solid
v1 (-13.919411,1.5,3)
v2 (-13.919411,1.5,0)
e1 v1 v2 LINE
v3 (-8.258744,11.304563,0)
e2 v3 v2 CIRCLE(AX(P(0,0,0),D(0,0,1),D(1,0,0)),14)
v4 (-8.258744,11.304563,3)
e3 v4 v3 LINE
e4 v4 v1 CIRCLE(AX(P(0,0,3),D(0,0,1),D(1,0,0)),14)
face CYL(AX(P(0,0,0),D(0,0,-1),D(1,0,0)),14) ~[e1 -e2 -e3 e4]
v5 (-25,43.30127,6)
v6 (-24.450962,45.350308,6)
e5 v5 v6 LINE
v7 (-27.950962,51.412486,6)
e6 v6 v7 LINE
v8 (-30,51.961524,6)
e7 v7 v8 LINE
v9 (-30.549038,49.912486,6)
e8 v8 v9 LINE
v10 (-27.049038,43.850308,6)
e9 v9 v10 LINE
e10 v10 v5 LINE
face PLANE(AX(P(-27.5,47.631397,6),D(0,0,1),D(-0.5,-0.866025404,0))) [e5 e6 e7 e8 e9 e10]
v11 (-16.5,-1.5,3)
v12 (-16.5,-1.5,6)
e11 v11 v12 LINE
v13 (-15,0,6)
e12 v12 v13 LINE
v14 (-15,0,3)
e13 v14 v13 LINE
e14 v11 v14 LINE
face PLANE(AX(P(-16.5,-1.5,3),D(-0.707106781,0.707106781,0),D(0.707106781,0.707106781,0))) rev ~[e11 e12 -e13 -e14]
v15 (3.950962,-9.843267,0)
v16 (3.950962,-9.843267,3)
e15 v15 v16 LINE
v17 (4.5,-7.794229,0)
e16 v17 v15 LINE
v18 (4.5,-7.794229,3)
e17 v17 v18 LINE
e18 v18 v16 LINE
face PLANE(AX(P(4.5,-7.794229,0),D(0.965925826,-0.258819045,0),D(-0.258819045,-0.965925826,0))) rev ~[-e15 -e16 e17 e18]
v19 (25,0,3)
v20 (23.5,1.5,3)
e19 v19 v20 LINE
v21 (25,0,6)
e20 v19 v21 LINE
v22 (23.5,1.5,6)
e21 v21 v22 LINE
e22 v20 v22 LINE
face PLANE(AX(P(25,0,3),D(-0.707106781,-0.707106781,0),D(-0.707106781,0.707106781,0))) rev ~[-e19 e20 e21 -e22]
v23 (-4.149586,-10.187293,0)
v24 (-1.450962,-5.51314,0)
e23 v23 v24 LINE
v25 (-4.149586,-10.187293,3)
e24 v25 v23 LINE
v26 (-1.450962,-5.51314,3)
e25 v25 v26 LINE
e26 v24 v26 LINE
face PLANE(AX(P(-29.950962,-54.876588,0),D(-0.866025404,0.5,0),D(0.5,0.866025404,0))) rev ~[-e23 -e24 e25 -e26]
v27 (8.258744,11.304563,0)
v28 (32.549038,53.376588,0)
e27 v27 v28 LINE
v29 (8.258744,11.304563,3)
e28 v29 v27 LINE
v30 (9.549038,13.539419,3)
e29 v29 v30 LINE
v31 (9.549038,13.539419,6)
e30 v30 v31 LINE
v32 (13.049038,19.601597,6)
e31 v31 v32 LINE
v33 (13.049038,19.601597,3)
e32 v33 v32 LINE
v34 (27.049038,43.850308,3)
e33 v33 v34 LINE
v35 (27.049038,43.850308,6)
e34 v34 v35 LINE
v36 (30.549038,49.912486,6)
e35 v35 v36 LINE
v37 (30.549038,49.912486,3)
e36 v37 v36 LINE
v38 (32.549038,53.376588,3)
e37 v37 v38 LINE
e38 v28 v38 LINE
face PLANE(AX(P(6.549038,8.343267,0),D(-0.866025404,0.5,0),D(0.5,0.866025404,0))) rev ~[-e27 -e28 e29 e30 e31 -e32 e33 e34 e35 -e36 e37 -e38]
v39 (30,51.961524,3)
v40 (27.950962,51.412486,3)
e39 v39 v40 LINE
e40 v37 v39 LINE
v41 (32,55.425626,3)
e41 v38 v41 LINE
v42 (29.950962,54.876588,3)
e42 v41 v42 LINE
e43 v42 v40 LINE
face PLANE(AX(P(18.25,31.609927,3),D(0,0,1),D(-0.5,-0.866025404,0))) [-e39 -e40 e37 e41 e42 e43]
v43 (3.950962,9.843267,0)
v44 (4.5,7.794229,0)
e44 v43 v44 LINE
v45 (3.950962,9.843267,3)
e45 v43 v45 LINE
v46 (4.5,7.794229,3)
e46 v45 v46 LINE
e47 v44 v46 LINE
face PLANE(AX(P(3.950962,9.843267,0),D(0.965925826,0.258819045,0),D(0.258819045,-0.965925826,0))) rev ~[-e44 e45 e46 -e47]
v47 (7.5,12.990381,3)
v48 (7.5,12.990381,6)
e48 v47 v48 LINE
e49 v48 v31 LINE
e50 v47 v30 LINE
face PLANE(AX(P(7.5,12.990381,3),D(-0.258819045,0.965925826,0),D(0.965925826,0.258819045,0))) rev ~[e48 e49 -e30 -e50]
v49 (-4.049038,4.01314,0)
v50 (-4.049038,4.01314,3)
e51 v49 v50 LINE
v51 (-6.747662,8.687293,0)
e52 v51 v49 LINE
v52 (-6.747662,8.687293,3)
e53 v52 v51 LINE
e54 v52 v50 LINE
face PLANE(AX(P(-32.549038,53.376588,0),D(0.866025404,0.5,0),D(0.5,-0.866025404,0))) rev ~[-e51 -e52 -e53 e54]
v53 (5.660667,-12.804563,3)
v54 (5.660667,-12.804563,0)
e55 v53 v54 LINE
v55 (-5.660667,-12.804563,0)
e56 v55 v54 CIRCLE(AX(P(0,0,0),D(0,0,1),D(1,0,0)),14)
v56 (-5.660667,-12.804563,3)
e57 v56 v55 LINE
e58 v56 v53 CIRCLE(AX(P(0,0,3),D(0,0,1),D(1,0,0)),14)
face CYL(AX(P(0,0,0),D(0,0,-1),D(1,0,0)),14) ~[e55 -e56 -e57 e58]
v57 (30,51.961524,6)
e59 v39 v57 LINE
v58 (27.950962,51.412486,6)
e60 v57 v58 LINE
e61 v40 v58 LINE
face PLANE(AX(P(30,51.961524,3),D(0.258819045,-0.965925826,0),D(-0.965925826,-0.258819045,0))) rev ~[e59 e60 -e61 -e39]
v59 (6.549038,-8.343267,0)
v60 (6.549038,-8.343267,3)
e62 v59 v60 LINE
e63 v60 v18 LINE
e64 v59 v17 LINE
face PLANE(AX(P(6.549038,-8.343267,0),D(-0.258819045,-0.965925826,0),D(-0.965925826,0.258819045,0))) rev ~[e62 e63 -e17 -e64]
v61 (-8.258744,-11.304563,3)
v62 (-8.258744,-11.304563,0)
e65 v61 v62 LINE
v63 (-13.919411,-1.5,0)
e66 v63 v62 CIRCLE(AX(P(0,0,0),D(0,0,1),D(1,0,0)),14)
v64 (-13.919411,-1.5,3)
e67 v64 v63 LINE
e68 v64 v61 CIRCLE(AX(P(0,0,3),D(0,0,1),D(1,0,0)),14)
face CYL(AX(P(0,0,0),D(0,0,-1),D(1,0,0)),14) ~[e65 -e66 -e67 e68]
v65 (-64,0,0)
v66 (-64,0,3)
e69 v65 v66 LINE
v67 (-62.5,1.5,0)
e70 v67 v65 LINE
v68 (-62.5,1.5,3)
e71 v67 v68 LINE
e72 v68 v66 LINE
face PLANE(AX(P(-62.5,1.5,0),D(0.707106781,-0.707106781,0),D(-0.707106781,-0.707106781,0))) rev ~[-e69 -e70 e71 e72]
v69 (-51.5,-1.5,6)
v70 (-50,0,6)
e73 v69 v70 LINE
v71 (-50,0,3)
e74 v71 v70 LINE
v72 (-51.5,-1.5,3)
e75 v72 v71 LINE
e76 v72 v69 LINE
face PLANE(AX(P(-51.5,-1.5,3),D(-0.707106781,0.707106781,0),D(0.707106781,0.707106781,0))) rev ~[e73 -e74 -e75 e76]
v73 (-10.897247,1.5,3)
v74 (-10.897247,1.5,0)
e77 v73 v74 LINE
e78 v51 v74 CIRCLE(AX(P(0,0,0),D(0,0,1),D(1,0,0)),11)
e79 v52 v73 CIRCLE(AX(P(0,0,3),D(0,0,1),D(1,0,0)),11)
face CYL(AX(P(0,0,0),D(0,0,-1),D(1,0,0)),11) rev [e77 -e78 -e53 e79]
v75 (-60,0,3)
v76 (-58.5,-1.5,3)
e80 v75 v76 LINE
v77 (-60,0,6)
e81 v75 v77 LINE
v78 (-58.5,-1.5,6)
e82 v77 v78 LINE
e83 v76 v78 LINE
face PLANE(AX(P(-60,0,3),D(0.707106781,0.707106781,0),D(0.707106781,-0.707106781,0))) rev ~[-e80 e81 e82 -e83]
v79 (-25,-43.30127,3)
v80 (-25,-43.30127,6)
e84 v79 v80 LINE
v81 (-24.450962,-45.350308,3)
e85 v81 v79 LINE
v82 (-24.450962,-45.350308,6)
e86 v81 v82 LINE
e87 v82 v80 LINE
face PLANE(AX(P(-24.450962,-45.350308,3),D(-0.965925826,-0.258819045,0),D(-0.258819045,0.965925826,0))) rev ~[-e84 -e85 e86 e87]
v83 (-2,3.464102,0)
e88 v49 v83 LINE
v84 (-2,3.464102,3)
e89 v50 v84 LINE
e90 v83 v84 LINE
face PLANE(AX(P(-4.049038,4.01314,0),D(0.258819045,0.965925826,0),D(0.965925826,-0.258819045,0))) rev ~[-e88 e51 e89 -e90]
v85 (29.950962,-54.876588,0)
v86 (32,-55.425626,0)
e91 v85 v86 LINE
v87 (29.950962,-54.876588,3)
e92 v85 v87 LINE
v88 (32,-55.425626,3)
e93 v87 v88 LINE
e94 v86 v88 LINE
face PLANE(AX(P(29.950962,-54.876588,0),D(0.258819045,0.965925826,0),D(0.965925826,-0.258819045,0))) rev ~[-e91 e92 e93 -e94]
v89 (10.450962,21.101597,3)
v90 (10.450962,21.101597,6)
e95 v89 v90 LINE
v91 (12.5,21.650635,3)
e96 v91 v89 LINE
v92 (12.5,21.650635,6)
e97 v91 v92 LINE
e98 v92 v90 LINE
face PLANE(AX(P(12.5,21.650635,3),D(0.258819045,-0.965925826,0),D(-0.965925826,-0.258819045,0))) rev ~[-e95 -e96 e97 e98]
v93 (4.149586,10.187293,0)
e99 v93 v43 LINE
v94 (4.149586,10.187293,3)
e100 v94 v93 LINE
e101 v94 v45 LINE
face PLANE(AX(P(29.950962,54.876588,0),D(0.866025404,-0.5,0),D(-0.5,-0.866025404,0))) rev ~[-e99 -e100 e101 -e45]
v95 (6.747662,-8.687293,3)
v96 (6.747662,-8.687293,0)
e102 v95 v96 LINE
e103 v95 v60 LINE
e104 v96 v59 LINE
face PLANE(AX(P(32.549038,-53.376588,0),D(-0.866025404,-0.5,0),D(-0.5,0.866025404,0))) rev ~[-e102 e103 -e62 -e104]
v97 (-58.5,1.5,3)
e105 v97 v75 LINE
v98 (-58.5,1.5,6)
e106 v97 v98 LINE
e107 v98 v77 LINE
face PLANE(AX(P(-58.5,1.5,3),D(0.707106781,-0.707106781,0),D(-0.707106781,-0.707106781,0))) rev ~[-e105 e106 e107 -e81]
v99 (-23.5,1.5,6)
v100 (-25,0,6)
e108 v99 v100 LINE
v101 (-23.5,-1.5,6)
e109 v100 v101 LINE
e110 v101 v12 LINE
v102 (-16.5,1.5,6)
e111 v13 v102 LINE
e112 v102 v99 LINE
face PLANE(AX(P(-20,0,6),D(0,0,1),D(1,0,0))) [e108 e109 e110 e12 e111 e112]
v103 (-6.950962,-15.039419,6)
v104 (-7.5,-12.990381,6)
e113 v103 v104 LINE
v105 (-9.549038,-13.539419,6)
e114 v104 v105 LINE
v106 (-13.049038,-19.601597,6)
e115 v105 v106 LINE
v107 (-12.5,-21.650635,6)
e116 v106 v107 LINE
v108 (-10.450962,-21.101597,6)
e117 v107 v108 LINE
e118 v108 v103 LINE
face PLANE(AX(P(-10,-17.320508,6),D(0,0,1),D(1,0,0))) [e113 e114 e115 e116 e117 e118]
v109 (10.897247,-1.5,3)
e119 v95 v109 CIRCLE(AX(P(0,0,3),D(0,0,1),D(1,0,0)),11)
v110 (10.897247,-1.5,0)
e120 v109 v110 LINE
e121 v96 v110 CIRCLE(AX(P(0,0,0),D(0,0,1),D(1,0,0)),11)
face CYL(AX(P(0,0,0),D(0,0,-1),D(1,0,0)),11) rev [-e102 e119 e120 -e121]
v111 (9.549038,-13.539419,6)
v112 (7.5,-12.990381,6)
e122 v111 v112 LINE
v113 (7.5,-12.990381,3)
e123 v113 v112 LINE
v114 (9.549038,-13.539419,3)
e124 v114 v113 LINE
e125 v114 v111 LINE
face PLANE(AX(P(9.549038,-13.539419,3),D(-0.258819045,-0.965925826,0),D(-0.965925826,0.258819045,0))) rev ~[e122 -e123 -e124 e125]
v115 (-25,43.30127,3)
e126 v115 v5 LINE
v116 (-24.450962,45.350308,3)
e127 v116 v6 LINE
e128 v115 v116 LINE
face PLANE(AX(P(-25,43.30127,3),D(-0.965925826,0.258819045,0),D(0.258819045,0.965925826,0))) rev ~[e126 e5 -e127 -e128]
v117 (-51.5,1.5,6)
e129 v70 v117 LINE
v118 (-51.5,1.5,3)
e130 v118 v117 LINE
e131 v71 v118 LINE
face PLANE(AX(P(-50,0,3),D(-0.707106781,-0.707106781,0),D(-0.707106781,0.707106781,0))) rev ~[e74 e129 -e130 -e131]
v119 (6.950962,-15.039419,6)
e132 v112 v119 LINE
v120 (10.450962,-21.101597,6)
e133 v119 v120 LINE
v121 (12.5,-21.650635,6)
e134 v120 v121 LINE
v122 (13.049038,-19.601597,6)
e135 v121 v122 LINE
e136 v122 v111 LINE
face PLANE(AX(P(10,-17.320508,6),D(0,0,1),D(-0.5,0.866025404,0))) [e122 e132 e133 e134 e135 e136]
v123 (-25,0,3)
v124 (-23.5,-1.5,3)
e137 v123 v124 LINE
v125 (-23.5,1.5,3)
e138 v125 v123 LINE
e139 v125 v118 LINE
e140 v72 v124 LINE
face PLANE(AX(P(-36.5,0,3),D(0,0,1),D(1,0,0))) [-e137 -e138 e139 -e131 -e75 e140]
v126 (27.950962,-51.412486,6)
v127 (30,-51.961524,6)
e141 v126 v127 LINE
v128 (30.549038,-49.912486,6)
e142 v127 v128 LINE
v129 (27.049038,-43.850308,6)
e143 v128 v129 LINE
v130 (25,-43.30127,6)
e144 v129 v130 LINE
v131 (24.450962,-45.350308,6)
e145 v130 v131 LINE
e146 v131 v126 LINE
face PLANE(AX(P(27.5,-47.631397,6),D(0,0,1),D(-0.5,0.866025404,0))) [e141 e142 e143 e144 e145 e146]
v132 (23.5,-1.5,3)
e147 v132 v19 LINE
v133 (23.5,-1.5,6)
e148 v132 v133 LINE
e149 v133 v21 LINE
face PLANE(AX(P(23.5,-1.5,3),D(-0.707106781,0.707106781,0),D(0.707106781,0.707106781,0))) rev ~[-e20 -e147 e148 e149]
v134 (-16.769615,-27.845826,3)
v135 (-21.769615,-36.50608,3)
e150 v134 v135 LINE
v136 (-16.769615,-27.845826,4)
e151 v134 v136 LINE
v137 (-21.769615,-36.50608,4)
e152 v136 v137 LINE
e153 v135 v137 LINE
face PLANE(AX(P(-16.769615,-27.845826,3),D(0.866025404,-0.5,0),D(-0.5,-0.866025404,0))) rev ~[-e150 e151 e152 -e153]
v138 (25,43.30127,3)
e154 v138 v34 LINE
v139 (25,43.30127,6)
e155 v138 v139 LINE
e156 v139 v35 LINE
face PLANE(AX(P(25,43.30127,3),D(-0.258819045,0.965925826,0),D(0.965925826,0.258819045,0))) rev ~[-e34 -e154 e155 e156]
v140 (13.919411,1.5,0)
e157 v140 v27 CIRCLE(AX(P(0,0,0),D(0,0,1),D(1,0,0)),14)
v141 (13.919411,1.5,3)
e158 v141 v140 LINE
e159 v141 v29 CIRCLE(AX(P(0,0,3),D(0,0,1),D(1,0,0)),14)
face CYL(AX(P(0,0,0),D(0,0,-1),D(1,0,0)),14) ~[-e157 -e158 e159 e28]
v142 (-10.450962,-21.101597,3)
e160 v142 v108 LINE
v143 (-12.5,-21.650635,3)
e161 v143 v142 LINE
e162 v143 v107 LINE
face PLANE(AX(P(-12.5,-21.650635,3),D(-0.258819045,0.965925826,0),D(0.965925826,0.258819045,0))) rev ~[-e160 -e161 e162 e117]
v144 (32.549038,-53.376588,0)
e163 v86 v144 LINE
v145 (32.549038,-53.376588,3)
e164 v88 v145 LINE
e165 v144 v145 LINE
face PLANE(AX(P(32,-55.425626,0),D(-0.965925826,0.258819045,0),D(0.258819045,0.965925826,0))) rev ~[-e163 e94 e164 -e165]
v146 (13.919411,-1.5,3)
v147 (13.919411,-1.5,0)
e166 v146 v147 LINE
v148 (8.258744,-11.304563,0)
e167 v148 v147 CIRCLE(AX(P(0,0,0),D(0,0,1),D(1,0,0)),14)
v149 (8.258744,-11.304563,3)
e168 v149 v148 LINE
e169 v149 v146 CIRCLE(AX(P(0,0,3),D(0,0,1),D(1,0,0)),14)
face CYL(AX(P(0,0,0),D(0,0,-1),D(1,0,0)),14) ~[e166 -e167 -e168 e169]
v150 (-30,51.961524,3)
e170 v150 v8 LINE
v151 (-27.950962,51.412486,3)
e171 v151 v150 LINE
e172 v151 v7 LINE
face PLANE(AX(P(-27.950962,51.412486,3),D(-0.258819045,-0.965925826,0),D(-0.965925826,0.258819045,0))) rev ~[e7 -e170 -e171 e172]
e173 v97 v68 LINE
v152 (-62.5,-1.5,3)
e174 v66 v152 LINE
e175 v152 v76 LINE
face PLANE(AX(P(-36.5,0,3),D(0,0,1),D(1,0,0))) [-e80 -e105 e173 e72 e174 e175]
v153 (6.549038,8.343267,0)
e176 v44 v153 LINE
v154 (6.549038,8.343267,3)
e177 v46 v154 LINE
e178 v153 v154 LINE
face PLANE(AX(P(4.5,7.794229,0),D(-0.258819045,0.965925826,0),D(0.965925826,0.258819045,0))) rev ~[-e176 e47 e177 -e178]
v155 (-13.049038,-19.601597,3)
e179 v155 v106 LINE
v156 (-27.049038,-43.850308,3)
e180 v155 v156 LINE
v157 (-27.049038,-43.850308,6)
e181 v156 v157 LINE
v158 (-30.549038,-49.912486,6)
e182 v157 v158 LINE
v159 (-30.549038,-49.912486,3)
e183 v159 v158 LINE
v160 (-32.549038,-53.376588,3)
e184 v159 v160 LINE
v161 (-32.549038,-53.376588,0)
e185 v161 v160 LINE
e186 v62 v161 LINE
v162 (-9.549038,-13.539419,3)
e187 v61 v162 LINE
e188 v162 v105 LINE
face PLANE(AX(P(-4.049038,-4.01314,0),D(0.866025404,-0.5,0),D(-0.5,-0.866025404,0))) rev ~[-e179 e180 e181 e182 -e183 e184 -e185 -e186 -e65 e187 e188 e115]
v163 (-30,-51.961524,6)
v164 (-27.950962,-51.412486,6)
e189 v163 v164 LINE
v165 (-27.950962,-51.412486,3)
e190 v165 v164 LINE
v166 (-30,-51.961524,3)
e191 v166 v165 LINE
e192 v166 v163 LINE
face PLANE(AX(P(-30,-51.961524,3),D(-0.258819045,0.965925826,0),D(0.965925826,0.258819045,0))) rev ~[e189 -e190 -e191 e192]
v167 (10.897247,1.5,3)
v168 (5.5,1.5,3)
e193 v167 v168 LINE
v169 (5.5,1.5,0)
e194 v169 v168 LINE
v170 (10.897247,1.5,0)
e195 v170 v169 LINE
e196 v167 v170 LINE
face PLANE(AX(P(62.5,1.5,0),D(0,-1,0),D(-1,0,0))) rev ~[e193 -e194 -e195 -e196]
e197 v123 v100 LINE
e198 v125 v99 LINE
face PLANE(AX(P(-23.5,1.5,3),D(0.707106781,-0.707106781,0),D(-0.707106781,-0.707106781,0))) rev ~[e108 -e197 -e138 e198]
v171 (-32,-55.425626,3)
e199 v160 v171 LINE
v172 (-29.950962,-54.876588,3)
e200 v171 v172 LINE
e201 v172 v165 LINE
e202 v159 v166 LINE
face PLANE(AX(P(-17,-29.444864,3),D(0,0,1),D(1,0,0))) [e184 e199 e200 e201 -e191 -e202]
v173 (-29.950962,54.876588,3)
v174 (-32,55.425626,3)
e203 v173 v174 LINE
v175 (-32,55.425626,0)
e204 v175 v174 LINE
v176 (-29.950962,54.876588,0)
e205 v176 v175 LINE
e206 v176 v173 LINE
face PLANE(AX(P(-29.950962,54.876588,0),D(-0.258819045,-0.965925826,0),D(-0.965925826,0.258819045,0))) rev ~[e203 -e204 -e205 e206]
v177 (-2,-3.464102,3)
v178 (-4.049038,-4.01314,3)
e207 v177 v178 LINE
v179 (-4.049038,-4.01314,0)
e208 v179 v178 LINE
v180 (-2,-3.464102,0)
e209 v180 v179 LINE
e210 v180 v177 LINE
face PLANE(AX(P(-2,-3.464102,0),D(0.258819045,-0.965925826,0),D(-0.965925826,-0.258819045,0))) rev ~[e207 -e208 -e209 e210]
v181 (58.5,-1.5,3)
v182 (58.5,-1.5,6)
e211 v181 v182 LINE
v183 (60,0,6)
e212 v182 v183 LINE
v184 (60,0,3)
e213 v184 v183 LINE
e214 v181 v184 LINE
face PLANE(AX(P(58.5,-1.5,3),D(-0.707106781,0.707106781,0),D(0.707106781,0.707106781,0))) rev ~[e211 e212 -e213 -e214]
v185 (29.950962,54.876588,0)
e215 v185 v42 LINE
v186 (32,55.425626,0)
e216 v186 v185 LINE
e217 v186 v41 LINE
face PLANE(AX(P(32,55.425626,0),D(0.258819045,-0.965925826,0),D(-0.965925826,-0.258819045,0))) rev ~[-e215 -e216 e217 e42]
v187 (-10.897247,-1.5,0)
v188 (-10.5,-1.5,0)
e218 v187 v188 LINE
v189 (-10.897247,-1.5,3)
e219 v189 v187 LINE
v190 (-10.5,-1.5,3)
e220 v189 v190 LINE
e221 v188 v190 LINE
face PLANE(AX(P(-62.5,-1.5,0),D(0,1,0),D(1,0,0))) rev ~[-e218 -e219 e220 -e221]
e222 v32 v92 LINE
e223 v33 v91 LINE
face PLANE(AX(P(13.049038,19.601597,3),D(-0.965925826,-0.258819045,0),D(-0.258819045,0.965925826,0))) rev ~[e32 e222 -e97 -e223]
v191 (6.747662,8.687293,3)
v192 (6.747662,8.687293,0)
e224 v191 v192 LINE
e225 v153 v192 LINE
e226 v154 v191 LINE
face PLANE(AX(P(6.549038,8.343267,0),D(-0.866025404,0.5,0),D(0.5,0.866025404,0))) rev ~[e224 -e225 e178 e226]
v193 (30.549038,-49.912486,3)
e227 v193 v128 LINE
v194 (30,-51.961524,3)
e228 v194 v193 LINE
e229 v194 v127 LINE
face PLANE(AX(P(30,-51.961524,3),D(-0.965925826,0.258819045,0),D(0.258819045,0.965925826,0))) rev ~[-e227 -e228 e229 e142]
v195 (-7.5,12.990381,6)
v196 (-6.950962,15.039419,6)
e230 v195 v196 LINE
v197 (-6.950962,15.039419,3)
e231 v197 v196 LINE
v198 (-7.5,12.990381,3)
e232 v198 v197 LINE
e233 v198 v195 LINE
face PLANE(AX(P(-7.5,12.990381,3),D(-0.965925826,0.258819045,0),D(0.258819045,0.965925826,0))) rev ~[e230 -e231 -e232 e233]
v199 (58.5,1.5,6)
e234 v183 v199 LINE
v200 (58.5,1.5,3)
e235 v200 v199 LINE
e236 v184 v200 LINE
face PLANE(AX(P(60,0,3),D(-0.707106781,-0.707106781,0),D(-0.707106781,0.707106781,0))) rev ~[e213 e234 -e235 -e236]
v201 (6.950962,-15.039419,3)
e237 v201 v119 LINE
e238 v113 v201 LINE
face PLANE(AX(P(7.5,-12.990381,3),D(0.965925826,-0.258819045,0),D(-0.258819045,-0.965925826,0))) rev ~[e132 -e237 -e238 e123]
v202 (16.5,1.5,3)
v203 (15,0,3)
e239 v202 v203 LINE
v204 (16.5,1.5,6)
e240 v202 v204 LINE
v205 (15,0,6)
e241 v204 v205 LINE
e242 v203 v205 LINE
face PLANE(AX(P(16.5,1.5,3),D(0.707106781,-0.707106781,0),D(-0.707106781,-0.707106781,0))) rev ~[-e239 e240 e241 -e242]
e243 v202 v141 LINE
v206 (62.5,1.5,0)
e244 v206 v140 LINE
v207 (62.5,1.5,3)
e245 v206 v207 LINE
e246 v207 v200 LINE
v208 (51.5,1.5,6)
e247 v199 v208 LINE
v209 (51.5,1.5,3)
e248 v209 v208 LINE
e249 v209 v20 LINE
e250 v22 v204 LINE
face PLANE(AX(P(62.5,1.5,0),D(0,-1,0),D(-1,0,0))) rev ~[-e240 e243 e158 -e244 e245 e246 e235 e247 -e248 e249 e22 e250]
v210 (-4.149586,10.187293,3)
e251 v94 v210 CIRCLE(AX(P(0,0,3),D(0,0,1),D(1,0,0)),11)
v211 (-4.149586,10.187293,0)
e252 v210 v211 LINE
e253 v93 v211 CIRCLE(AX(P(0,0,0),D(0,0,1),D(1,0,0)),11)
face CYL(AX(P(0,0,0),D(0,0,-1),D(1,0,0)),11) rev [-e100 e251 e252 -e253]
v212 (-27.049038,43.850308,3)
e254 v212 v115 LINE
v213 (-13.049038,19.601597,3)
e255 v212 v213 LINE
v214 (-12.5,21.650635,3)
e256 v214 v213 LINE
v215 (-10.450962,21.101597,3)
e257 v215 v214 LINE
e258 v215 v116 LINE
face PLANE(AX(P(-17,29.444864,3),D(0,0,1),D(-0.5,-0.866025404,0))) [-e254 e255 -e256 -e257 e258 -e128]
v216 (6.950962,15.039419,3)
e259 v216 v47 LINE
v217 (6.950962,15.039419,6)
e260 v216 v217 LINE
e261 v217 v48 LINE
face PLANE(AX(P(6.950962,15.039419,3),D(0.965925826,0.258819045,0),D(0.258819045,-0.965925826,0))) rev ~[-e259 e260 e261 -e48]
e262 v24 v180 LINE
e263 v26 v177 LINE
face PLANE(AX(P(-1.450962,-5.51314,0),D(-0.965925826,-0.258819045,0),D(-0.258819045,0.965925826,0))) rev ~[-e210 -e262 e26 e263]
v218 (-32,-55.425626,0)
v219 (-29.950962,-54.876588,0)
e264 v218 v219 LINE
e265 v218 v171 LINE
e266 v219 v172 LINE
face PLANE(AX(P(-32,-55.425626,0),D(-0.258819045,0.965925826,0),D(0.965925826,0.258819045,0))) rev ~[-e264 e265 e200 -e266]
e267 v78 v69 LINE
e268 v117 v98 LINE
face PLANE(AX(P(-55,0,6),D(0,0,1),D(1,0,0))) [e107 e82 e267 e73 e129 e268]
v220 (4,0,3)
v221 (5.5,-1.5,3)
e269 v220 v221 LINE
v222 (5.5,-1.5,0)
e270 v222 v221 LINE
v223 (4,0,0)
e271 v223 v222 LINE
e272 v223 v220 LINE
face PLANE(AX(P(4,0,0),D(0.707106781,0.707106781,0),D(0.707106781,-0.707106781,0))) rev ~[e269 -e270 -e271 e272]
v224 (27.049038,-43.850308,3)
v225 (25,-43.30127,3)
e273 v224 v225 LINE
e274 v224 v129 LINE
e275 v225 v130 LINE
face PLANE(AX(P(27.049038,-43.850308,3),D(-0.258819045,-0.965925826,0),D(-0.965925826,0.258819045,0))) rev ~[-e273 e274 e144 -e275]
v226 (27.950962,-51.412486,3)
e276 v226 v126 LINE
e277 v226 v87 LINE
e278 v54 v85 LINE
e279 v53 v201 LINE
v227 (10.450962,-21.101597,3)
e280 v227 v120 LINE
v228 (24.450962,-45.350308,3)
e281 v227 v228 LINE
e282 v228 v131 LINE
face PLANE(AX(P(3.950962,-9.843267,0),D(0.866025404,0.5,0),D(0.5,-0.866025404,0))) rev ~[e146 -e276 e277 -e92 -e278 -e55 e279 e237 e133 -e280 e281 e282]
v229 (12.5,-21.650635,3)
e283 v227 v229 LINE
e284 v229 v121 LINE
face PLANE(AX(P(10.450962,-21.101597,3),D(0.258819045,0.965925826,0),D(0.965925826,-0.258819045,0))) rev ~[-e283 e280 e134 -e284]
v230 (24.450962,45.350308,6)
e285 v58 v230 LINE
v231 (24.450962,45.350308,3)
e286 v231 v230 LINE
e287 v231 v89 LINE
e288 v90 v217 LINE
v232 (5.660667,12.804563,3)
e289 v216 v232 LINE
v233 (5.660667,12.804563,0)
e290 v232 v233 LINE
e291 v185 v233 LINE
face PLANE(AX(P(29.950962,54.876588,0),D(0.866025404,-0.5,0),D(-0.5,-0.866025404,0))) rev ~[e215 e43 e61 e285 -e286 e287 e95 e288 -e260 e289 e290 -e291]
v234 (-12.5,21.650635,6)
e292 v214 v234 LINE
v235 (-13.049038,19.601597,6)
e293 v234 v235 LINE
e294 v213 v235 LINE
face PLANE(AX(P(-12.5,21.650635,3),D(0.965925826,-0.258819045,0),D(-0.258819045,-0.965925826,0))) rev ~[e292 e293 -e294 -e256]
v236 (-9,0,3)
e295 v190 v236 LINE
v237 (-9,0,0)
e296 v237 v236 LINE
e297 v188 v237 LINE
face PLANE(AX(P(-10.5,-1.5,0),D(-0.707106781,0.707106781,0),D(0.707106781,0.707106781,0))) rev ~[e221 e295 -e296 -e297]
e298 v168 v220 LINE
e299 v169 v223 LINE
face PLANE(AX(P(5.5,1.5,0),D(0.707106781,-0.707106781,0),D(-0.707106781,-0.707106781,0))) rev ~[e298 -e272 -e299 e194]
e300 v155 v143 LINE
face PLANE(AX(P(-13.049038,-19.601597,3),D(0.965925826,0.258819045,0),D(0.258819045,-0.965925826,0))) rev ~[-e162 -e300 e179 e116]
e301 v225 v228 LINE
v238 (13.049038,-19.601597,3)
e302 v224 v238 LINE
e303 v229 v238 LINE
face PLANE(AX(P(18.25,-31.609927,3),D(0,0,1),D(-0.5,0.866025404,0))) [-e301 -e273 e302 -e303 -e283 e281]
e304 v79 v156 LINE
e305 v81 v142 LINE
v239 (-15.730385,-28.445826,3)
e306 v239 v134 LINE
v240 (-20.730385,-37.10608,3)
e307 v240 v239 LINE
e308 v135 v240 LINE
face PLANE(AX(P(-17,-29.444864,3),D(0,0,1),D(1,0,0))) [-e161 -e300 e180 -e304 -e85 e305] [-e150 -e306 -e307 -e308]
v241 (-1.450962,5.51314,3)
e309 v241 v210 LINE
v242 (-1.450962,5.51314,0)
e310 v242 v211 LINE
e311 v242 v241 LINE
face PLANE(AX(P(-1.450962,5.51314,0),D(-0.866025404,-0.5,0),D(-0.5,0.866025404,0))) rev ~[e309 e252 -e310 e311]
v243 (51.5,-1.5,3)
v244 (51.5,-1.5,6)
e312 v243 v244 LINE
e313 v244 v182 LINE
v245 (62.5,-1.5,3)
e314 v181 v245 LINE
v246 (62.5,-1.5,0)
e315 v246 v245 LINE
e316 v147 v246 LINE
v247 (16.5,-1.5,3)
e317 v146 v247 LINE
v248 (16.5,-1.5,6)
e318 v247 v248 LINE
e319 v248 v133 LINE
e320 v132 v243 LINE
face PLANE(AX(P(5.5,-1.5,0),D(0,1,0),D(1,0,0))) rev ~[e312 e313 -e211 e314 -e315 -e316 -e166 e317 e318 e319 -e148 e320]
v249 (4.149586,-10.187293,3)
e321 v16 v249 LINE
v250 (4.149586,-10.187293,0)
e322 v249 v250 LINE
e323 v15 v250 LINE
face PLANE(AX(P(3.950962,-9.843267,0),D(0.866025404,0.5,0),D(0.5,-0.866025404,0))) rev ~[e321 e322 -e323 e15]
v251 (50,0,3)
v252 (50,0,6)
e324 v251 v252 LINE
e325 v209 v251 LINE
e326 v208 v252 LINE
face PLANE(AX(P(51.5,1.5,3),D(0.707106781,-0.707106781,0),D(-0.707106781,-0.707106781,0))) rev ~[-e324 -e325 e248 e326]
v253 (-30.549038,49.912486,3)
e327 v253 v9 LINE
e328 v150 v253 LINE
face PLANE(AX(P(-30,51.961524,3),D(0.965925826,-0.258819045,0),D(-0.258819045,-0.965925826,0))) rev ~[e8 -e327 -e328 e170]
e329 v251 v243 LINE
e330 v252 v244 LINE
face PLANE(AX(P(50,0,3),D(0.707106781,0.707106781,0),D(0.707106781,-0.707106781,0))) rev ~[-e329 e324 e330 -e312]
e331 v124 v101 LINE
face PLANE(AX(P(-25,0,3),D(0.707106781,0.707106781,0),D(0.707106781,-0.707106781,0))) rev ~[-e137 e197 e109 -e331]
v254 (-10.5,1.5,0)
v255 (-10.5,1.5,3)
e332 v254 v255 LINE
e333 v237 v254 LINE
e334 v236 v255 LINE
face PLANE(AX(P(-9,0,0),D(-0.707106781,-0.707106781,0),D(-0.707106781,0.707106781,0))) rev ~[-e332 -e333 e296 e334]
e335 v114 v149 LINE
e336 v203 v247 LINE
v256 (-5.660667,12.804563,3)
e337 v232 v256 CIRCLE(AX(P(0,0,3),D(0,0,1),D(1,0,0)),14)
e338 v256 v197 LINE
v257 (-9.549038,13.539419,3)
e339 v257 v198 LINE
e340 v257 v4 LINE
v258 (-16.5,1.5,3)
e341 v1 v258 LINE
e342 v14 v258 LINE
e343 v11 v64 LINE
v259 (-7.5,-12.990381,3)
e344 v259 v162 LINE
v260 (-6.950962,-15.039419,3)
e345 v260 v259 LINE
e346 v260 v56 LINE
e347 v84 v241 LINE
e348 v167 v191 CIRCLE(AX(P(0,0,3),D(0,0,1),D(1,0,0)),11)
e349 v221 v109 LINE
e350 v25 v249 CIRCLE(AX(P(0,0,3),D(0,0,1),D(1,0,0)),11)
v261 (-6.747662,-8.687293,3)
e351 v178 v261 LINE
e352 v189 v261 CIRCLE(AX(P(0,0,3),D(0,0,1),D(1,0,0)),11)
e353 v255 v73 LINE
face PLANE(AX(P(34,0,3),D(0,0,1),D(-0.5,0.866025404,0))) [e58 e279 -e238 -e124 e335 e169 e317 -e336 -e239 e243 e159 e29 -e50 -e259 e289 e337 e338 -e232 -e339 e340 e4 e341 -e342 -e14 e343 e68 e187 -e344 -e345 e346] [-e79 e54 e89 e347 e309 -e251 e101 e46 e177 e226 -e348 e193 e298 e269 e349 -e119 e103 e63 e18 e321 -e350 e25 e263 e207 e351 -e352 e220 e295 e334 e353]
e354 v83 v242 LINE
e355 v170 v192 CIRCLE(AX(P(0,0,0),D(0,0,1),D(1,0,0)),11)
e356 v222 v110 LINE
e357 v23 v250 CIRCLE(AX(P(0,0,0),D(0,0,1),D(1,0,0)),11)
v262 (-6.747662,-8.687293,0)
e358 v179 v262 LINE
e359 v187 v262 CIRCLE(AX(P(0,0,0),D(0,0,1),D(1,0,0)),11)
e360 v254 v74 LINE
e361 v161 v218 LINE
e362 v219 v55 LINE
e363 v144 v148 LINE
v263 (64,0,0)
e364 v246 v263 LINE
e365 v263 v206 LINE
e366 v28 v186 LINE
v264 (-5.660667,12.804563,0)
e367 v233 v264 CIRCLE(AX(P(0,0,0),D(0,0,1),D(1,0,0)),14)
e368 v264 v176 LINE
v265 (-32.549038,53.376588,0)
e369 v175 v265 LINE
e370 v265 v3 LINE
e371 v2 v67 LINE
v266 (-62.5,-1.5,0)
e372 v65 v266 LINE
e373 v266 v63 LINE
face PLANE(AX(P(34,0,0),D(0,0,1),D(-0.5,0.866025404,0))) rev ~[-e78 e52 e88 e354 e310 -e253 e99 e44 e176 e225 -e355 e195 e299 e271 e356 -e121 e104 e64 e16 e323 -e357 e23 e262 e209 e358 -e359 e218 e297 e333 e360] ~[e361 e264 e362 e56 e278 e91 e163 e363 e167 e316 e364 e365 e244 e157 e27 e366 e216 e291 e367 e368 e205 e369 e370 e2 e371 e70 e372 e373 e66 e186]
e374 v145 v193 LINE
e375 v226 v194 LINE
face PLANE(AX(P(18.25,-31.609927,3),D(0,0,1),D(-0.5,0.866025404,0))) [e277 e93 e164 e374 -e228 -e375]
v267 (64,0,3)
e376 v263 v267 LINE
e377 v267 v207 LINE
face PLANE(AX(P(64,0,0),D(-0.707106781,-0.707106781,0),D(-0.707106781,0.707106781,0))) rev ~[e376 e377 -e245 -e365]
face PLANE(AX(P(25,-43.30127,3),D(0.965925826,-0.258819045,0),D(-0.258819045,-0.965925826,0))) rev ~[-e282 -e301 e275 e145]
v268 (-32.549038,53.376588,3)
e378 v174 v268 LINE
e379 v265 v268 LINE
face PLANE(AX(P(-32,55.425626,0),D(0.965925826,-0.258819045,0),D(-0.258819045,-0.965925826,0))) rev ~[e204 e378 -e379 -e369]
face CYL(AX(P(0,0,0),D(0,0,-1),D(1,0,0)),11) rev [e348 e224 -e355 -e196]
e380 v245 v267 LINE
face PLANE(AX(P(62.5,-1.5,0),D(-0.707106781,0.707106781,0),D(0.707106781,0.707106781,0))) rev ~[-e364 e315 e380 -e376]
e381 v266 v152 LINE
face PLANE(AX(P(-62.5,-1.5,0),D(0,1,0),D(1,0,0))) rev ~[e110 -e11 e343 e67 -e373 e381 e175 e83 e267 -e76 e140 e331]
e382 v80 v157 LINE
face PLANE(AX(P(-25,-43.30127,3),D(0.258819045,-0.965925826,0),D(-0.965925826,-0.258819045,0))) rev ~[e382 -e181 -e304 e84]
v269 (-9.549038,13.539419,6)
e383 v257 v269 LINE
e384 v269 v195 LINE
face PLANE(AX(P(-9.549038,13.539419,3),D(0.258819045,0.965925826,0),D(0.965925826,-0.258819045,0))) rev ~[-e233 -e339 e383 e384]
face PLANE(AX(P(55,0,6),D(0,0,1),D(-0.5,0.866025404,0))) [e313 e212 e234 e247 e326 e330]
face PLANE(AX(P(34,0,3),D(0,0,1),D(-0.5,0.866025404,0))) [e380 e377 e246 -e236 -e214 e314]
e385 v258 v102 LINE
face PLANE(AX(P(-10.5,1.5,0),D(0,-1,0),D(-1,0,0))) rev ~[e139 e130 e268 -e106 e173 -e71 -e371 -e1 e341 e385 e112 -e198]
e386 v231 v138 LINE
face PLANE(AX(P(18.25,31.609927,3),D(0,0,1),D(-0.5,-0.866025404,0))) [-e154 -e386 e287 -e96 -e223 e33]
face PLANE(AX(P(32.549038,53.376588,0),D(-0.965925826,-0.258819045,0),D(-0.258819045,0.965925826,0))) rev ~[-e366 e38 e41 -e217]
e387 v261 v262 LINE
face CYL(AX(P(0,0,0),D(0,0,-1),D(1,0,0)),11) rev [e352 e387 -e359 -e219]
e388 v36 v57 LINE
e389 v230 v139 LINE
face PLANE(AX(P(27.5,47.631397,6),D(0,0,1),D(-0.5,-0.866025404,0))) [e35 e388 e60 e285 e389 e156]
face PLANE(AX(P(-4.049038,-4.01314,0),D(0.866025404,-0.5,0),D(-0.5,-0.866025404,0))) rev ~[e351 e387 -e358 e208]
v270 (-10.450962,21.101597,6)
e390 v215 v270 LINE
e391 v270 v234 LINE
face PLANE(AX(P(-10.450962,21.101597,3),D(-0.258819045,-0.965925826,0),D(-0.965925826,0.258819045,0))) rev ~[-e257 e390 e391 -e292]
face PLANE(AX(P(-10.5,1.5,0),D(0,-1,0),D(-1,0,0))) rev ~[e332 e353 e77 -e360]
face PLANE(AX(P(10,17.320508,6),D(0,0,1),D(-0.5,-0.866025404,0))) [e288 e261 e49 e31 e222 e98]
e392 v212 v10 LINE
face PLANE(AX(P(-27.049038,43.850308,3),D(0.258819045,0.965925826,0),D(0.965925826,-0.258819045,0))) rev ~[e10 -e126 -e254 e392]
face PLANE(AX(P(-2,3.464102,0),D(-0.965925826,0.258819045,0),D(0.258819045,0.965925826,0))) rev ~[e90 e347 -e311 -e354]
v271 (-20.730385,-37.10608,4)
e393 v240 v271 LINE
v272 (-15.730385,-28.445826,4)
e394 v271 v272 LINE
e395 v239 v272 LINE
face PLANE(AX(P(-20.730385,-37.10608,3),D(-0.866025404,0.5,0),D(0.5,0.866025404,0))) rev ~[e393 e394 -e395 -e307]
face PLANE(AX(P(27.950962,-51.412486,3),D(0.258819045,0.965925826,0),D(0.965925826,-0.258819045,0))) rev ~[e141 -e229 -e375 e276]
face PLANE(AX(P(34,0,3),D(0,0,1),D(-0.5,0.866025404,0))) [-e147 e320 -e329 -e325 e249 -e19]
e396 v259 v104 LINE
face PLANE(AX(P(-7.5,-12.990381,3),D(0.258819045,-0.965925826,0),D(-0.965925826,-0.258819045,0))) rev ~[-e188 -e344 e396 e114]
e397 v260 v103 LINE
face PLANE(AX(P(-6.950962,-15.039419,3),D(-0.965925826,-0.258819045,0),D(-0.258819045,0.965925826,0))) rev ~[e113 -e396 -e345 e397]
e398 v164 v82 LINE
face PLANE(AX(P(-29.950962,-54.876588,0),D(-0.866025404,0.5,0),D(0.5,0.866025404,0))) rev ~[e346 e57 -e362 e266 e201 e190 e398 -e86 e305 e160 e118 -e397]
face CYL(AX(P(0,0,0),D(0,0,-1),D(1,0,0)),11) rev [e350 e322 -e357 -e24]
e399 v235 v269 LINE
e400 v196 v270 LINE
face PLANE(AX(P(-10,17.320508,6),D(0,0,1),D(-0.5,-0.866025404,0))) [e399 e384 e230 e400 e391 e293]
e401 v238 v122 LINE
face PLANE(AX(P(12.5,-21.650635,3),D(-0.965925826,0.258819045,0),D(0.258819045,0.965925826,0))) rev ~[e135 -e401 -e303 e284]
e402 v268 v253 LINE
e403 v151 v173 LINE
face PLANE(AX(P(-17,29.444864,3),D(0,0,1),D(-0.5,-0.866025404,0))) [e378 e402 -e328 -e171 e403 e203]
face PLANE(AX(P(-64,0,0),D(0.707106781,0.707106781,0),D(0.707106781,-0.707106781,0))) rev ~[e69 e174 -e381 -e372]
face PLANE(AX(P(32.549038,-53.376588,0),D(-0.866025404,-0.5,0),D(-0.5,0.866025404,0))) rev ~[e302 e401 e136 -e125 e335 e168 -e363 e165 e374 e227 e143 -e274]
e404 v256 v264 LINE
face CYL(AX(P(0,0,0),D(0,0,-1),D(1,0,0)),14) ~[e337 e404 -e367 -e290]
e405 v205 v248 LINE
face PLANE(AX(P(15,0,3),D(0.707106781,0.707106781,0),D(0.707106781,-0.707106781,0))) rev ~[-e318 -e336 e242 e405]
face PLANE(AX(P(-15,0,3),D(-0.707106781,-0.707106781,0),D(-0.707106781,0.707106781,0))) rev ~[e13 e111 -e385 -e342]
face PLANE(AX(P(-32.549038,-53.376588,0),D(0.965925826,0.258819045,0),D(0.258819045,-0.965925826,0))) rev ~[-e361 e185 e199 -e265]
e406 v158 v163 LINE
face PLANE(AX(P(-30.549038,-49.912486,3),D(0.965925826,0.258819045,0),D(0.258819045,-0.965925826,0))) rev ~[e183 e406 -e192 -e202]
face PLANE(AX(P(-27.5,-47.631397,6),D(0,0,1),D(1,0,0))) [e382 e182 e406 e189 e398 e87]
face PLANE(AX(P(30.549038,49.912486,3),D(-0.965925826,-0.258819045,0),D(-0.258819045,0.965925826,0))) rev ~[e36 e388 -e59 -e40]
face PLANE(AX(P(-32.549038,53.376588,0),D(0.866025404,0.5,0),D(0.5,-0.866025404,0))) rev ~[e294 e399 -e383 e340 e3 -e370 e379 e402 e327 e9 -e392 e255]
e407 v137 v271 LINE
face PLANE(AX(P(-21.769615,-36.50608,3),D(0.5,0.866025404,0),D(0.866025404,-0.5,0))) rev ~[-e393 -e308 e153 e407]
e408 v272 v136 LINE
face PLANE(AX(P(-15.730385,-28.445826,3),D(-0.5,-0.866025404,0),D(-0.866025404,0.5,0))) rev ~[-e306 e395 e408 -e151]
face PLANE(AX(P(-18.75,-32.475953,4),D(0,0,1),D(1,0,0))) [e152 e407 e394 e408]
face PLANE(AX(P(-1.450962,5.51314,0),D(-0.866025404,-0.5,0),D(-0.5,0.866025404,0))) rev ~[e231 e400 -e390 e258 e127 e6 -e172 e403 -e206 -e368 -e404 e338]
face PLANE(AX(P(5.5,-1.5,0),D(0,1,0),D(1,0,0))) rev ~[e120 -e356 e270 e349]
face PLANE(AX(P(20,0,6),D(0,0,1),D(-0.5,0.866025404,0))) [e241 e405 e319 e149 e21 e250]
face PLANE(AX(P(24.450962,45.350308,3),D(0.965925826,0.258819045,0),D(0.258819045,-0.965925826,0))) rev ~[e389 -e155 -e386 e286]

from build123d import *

# Parameters (mm, degrees)
F1_DEPTH = 3
F4_DEPTH = 3
F5_COUNT = 3
F5_ANGLE = 240
F7_DEPTH = 1
F8_R     = 14
F8_R_2   = 11
F9_DEPTH = 3


# Not quite as in the source:
# - a feature names something its author has since deleted; it is built from what else it names


with BuildPart() as f1:
    # F0 (on Top) → F1 (new body)
    with BuildSketch(Plane.XY):
        Polygon((-2, -3.4641016151), (-4.0490381057, -4.0131397208), (-32.5490381057, -53.3765877365), (-32, -55.4256258422), (-29.9509618943, -54.8765877365), (-1.4509618943, -5.5131397208), align=None)
    extrude(amount=F1_DEPTH)

    # F3 (on face) → F4, piece 2 (join)
    with BuildSketch(Plane.XY.offset(3)):
        Polygon((-27.0490381057, -43.8503082949), (-30.5490381057, -49.9124861214), (-30, -51.9615242271), (-27.9509618943, -51.4124861214), (-24.4509618943, -45.3503082949), (-25, -43.3012701892), align=None)
        Polygon((-9.5490381057, -13.5394191624), (-13.0490381057, -19.6015969889), (-12.5, -21.6506350946), (-10.4509618943, -21.1015969889), (-6.9509618943, -15.0394191624), (-7.5, -12.9903810568), align=None)
    extrude(amount=F4_DEPTH)


with BuildPart() as f1b:
    # F0 (on Top) → F1, piece 2 (new body)
    with BuildSketch(Plane.XY):
        Polygon((-10.5, 1.5), (-62.5, 1.5), (-64, 0), (-62.5, -1.5), (-10.5, -1.5), (-9, 0), align=None)
    extrude(amount=F1_DEPTH)

    # F3 (on face) → F4 (join)
    with BuildSketch(Plane.XY.offset(3)):
        Polygon((-51.5, 1.5), (-58.5, 1.5), (-60, 0), (-58.5, -1.5), (-51.5, -1.5), (-50, 0), align=None)
        Polygon((-16.5, 1.5), (-23.5, 1.5), (-25, 0), (-23.5, -1.5), (-16.5, -1.5), (-15, 0), align=None)
    extrude(amount=F4_DEPTH)


with BuildPart() as f5_1:
    # F5: instance of F1
    add(f1.part.rotate(Axis((0, 0, 0.1916177571), (0, 0, -1)), 1 * F5_ANGLE / (F5_COUNT - 1)))


with BuildPart() as f5_2:
    # F5: instance of F1
    add(f1.part.rotate(Axis((0, 0, 0.1916177571), (0, 0, -1)), 2 * F5_ANGLE / (F5_COUNT - 1)))


with BuildPart() as f5_3:
    # F5: instance of F1b
    add(f1b.part.rotate(Axis((0, 0, 0.1916177571), (0, 0, -1)), 1 * F5_ANGLE / (F5_COUNT - 1)))


with BuildPart() as f5_4:
    # F5: instance of F1b
    add(f1b.part.rotate(Axis((0, 0, 0.1916177571), (0, 0, -1)), 2 * F5_ANGLE / (F5_COUNT - 1)))


with BuildPart() as f1_1:
    add(f1.part)

    # F6 (on face) → F7 (join)
    with BuildSketch(Plane.XY.offset(3)):
        Polygon((-15.7303847577, -28.445825623), (-16.7696152423, -27.845825623), (-21.7696152423, -36.5060796608), (-20.7303847577, -37.1060796608), align=None)
    extrude(amount=F7_DEPTH)

    add(f1b.part)  # F9 merges F1b

    add(f5_1.part)  # F9 merges F5_1

    add(f5_2.part)  # F9 merges F5_2

    add(f5_3.part)  # F9 merges F5_3

    add(f5_4.part)  # F9 merges F5_4
    # F8 (on Top) → F9 (join)
    with BuildSketch(Plane.XY):
        Circle(F8_R)
        Circle(F8_R_2, mode=Mode.SUBTRACT)
    extrude(amount=F9_DEPTH)


solid = f1_1.part
